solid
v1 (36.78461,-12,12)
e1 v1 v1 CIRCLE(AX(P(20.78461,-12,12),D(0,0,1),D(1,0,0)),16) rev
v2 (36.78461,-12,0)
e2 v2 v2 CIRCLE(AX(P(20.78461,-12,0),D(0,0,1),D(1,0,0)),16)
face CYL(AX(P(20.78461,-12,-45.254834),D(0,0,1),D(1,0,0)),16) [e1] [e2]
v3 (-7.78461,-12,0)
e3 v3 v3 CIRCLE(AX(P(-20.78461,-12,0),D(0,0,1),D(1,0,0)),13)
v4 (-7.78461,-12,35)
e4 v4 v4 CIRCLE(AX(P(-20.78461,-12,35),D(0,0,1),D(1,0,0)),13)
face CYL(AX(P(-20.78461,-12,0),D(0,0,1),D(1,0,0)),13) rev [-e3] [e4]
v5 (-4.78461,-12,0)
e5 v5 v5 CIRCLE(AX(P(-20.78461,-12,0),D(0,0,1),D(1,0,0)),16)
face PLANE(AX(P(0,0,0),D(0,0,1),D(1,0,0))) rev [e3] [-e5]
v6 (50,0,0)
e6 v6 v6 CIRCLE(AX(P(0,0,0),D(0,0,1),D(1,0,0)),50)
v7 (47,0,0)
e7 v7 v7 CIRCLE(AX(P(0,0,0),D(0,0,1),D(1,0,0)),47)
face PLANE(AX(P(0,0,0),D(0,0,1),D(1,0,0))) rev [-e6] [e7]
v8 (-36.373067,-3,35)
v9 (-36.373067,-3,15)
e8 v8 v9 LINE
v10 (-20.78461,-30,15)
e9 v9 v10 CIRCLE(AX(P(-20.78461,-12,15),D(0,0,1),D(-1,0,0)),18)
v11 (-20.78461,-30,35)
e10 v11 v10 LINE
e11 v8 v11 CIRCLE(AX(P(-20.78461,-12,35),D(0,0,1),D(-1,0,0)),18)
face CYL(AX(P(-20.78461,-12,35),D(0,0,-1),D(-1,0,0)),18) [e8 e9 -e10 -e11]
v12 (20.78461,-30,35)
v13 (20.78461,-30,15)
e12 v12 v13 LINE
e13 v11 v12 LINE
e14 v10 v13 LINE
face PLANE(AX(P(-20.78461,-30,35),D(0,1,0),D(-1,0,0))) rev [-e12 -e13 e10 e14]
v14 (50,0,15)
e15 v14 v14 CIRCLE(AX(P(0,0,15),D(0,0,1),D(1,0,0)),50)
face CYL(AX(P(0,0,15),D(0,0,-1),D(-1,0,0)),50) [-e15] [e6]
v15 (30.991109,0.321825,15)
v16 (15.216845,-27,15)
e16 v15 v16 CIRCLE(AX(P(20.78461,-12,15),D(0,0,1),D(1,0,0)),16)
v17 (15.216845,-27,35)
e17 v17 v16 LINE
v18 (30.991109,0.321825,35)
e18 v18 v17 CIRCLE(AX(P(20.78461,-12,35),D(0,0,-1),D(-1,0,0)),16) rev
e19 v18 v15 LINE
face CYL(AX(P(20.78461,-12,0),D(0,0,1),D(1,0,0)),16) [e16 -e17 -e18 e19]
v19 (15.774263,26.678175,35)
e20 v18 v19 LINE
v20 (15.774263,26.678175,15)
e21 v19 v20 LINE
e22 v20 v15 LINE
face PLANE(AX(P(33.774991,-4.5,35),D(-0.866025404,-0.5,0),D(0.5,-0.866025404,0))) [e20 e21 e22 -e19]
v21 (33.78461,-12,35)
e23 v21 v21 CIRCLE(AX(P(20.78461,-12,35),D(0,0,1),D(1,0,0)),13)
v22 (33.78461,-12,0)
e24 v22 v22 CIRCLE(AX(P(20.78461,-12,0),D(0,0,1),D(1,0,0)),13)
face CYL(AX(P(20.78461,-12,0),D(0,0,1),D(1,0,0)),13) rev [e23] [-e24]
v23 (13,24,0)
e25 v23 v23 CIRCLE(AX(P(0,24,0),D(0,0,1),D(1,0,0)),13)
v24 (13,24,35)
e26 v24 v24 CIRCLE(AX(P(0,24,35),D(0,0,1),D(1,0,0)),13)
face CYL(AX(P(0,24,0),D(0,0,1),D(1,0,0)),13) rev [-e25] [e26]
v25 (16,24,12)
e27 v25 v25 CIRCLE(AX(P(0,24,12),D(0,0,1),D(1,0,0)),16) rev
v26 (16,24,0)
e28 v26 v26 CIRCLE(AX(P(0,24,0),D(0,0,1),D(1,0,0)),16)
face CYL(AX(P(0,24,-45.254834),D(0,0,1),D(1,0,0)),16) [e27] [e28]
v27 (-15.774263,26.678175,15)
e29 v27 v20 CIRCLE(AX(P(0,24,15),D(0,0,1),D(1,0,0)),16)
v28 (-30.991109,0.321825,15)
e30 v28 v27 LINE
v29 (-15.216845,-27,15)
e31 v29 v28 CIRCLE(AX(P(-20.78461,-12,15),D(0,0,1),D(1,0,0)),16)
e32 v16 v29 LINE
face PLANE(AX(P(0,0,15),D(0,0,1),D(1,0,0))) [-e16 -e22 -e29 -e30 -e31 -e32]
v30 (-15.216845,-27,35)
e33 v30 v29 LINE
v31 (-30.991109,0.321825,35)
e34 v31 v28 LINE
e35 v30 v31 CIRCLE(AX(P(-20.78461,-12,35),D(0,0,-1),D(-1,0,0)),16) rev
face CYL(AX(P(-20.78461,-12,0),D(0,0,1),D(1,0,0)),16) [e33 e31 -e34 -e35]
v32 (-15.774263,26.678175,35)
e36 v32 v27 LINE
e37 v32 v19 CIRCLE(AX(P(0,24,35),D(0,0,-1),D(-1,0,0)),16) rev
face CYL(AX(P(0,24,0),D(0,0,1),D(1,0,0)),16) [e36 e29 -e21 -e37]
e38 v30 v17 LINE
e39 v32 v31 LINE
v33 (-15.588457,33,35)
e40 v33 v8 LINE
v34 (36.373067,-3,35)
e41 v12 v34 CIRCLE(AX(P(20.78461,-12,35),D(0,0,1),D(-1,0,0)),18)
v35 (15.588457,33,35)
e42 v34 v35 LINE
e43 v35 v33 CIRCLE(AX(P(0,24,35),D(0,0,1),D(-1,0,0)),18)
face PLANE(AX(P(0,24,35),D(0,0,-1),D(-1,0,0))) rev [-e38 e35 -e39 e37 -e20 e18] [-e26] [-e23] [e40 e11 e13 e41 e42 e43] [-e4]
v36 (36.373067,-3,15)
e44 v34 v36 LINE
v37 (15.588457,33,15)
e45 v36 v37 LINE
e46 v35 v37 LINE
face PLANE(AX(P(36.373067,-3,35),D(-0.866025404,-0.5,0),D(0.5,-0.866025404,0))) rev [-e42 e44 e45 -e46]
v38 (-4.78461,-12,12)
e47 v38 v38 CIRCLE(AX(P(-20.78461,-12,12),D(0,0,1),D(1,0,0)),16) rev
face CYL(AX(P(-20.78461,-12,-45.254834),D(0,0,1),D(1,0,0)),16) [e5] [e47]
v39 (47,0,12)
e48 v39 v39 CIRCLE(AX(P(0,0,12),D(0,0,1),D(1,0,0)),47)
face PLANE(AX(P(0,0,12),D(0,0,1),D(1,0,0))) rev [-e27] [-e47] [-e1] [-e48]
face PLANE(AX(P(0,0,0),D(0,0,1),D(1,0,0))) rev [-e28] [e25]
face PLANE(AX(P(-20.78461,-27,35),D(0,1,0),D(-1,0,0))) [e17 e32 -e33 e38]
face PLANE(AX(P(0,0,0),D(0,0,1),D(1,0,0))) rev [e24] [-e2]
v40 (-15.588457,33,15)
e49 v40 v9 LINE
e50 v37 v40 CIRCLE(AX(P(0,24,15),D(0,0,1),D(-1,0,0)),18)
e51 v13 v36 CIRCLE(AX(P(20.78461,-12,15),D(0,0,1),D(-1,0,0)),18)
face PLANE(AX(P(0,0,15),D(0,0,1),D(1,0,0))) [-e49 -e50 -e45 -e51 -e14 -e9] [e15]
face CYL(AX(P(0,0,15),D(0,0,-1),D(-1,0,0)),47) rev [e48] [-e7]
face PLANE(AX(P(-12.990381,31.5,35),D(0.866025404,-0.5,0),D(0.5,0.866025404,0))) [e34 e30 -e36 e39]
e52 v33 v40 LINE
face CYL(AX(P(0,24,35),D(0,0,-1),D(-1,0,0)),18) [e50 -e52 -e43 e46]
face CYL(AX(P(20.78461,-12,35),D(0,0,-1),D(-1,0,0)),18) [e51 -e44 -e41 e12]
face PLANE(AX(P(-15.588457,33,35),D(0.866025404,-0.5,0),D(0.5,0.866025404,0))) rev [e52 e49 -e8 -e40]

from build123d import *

# Parameters (mm, degrees)
SKETCH_1_R          = 50
EXTRUDE_1_DEPTH     = 15
SHELL_1_T           = -3
EXTRUDE_2_DEPTH     = 20
SKETCH_3_R          = 13
CUT_EXTRUDE_1_DEPTH = 79.89866919
SKETCH_4_R          = 16
SKETCH_4_R_2        = 13
EXTRUDE_3_DEPTH     = 12
SHELL_START         = 15
SHELL_5_DEPTH       = 20


# Read off the part's stored shape, not the designer's step: 薄殼5
with BuildPart() as part:
    # 草圖1 → 填料-伸長1 (new body)
    with BuildSketch(Plane.XY):
        Circle(SKETCH_1_R)
    extrude(amount=EXTRUDE_1_DEPTH)

    # 薄殼1
    shell_1_openings = [part.faces().sort_by_distance(p)[0] for p in [
        (0, 0, 0),
    ]]
    offset(amount=SHELL_1_T, openings=shell_1_openings, kind=Kind.INTERSECTION)

    # 草圖2 → 填料-伸長2 (add)
    with BuildSketch(Plane.XY.offset(15)):
        with BuildLine():
            Line((-15.588457268, 33), (-36.373066959, -3))
            ThreePointArc((-36.373066959, -3), (-36.373066959, -21), (-20.784609691, -30))
            Line((-20.784609691, -30), (20.784609691, -30))
            ThreePointArc((20.784609691, -30), (36.373066959, -21), (36.373066959, -3))
            Line((36.373066959, -3), (15.588457268, 33))
            ThreePointArc((15.588457268, 33), (0, 42), (-15.588457268, 33))
        make_face()
    extrude(amount=EXTRUDE_2_DEPTH)

    # 草圖3 → 除料-伸長1 (cut, through all)
    with BuildSketch(Plane.XY.offset(35)):
        with Locations((0, 24)):
            Circle(SKETCH_3_R)
        with Locations((-20.784609691, -12)):
            Circle(SKETCH_3_R)
        with Locations((20.784609691, -12)):
            Circle(SKETCH_3_R)
    extrude(amount=-CUT_EXTRUDE_1_DEPTH, mode=Mode.SUBTRACT)

    # 草圖4 → 填料-伸長3 (add)
    # profile 1 of 3: a face of its own
    with BuildSketch(Plane(origin=(0, 0, 12), x_dir=(-1, 0, 0), z_dir=(0, 0, -1))):
        with Locations(Location((0, 24, 0), (0, 0, 180))):
            Circle(SKETCH_4_R)
        with Locations(Location((0, 24, 0), (0, 0, 180))):
            Circle(SKETCH_4_R_2, mode=Mode.SUBTRACT)
    # profile 2 of 3: a face of its own
    with BuildSketch(Plane(origin=(0, 0, 12), x_dir=(-1, 0, 0), z_dir=(0, 0, -1))):
        with Locations(Location((20.784609691, -12, 0), (0, 0, 180))):
            Circle(SKETCH_4_R)
        with Locations(Location((20.784609691, -12, 0), (0, 0, 180))):
            Circle(SKETCH_4_R_2, mode=Mode.SUBTRACT)
    # profile 3 of 3: a face of its own
    with BuildSketch(Plane(origin=(0, 0, 12), x_dir=(-1, 0, 0), z_dir=(0, 0, -1))):
        with Locations(Location((-20.784609691, -12, 0), (0, 0, 180))):
            Circle(SKETCH_4_R)
        with Locations(Location((-20.784609691, -12, 0), (0, 0, 180))):
            Circle(SKETCH_4_R_2, mode=Mode.SUBTRACT)
    extrude(amount=EXTRUDE_3_DEPTH)

    # 薄殼5 outline → 薄殼5 (cut)
    with BuildSketch(Plane.XY.offset(SHELL_START)):
        with BuildLine():
            ThreePointArc((15.774263238, 26.67817462), (0, 8), (-15.774263238, 26.67817462))
            Line((-15.774263238, 26.67817462), (-30.991108566, 0.32182538))
            ThreePointArc((-30.991108566, 0.32182538), (-6.92820323, -4), (-15.216845328, -27))
            Line((-15.216845328, -27), (15.216845328, -27))
            ThreePointArc((15.216845328, -27), (6.92820323, -4), (30.991108566, 0.32182538))
            Line((30.991108566, 0.32182538), (15.774263238, 26.67817462))
        make_face()
    extrude(amount=SHELL_5_DEPTH, mode=Mode.SUBTRACT)


solid = part.part
